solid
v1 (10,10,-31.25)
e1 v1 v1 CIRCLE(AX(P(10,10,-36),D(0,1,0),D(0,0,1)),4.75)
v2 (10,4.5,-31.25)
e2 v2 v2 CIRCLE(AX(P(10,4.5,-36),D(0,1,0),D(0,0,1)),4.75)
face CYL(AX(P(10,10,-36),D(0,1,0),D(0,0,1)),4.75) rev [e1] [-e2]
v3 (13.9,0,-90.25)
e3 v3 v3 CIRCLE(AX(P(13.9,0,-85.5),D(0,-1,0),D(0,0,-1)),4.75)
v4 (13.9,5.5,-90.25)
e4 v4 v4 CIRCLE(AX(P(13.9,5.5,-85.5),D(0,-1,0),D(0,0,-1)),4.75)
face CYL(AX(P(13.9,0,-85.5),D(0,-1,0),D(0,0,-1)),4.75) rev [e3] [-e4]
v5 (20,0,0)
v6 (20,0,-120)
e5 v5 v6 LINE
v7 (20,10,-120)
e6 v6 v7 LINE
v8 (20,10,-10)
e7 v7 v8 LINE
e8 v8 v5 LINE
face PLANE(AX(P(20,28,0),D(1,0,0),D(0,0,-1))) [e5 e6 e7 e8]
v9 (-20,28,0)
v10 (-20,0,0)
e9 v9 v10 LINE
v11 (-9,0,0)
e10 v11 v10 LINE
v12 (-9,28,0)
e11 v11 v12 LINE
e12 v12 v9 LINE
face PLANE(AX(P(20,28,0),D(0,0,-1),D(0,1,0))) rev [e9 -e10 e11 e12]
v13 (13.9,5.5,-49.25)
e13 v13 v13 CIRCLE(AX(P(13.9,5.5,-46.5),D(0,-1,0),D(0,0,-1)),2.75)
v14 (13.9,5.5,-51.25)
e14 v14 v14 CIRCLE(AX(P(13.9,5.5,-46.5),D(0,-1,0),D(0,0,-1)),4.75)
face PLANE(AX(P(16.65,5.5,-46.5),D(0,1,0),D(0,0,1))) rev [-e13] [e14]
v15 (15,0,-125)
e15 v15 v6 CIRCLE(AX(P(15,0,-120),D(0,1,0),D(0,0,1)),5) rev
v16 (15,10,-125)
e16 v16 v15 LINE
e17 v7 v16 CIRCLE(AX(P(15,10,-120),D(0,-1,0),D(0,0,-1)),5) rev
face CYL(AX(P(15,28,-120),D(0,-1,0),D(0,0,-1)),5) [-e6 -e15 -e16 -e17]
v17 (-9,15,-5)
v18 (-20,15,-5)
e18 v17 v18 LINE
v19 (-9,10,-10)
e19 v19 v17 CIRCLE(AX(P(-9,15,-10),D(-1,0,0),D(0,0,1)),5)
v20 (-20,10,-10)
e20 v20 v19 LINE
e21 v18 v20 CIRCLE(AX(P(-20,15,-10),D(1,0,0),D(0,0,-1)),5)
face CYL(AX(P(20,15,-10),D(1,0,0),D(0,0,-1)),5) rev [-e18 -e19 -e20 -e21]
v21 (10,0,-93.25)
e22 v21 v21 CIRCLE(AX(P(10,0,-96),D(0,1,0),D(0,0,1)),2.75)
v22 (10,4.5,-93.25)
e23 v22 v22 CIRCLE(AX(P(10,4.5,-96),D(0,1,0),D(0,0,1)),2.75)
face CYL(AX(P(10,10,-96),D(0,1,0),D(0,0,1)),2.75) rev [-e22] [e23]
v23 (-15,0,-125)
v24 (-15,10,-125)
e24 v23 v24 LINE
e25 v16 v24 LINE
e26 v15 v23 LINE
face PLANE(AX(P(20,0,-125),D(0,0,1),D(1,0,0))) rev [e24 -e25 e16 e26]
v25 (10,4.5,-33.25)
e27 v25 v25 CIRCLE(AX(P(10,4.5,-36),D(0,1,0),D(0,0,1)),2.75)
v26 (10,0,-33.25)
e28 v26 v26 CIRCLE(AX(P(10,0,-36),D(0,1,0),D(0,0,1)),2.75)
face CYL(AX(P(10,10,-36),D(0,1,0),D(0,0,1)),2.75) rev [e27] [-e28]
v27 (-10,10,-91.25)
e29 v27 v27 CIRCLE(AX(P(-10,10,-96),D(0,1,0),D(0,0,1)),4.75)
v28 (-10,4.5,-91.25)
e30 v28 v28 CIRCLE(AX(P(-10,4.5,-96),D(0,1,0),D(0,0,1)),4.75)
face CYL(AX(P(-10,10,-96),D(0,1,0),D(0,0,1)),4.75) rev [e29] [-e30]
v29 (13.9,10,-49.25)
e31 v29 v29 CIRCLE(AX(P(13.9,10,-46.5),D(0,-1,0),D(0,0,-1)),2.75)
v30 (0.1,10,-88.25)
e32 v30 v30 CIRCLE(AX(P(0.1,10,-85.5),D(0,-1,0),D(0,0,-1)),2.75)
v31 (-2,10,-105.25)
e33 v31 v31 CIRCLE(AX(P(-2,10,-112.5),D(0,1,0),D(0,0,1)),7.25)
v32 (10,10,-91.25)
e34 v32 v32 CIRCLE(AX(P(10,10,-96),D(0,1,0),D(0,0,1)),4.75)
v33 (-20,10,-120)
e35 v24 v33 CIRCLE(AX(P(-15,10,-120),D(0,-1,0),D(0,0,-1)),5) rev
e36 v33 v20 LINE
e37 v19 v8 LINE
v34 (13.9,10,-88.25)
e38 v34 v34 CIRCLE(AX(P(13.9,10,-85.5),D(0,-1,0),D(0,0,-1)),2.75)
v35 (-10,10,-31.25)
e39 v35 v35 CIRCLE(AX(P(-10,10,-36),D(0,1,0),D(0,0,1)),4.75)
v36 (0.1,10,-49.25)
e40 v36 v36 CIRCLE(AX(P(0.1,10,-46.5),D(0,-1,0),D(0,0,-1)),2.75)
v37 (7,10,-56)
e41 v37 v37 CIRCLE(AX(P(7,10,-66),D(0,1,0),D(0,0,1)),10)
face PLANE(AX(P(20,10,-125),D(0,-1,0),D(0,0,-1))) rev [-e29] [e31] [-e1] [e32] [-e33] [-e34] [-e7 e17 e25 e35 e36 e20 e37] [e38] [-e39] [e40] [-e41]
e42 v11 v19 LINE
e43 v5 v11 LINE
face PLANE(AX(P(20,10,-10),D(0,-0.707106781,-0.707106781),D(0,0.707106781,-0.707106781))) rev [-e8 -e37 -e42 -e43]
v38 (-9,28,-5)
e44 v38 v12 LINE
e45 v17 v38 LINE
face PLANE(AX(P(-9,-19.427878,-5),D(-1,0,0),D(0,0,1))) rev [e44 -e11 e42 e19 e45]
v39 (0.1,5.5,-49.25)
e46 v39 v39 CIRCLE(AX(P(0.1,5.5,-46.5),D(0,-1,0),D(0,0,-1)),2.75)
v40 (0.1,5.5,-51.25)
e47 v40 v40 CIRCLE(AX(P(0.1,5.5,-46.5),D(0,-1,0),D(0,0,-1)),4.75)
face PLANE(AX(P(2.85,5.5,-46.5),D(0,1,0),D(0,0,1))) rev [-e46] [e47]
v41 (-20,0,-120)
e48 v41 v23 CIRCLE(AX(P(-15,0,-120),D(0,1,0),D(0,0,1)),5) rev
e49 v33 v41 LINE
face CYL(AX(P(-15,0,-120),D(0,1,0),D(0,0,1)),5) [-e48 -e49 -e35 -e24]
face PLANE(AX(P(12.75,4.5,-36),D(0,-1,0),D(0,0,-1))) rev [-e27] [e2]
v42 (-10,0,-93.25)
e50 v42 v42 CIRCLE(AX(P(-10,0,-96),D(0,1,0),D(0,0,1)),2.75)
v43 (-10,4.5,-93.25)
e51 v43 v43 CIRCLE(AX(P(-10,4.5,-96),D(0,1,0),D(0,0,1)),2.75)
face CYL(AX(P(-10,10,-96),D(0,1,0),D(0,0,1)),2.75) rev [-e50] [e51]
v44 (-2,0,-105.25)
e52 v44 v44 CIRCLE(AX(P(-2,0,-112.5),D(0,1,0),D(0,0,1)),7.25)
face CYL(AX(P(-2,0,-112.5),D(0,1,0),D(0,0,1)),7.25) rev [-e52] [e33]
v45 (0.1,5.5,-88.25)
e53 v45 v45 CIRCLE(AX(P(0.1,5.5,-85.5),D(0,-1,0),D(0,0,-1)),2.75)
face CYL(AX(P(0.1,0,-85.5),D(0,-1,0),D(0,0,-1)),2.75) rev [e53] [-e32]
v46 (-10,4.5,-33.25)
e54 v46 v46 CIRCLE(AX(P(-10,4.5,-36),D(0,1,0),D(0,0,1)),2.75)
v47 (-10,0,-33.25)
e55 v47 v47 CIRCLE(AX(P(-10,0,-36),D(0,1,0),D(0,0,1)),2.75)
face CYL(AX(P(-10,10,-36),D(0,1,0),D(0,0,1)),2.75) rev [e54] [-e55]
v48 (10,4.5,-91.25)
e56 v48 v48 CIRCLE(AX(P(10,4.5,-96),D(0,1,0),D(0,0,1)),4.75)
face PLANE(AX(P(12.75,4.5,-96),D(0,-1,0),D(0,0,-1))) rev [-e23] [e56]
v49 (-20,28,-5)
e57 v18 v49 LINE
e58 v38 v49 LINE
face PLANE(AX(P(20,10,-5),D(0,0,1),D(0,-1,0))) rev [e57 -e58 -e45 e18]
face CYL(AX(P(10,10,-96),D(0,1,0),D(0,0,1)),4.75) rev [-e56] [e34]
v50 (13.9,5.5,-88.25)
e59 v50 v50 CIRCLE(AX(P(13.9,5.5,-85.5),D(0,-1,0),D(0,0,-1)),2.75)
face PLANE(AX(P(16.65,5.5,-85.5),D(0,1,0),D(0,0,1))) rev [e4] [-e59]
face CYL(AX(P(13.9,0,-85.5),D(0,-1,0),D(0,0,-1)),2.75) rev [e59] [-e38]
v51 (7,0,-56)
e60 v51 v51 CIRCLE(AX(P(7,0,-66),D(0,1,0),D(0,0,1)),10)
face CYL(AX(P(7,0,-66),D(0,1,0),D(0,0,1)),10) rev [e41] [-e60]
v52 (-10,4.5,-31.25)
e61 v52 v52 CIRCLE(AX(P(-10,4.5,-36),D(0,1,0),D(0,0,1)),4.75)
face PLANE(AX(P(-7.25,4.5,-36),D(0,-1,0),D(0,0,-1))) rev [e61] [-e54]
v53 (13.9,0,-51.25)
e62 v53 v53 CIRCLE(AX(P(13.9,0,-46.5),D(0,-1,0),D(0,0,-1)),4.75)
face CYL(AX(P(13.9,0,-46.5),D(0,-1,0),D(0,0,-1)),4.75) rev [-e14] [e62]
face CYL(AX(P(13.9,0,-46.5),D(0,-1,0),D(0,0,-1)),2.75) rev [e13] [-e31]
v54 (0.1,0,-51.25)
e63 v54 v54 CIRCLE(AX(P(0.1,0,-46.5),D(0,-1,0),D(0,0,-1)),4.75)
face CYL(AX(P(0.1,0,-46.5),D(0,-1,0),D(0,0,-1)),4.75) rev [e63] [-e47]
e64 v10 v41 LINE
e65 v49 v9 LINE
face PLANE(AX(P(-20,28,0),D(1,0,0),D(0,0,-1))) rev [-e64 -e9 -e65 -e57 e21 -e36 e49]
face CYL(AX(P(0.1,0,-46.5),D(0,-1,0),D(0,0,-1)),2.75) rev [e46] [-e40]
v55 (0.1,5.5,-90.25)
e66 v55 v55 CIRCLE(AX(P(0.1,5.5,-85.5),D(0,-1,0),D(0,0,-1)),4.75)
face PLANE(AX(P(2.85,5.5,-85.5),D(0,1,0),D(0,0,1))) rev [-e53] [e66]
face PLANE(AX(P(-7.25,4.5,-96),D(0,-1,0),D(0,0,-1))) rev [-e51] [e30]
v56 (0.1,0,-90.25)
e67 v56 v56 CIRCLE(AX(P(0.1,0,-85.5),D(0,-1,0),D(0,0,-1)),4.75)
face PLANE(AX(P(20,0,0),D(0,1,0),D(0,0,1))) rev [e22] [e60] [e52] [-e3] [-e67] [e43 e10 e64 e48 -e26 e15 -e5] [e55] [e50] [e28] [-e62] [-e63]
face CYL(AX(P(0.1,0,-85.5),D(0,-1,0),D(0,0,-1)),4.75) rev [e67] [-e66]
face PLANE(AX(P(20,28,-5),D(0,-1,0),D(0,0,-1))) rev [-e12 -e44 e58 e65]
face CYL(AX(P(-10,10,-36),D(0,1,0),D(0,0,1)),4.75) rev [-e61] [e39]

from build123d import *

# Parameters (mm, degrees)
EXTRUDE_1_DEPTH           = 20
SKETCH_2_W                = 29
SKETCH_2_H                = 5
CUT_EXTRUDE_1_DEPTH       = 18
FILLET_1_R                = 5
CHAMFER_1_SIZE            = 10
SKETCH_3_R                = 10
CUT_EXTRUDE_2_DEPTH       = 128.863208156
HOLE_WIZARD_1_D           = 5.5
HOLE_WIZARD_1_CBORE_D     = 9.5
HOLE_WIZARD_1_CBORE_DEPTH = 5.5
HOLE_WIZARD_2_D           = 5.5
HOLE_WIZARD_2_DEPTH       = 31
HOLE_WIZARD_2_CBORE_D     = 9.5
HOLE_WIZARD_2_CBORE_DEPTH = 5.5
SKETCH_9_R                = 7.25
CUT_EXTRUDE_3_DEPTH       = 128.863208156
FILLET_2_R                = 5


with BuildPart() as part:
    # 草图1 → 凸台-拉伸1 (new, symmetric)
    with BuildSketch(Plane(origin=(0, 0, 0), x_dir=(0, 0, -1), z_dir=(1, 0, 0))):
        Polygon((0, 28), (0, 0), (125, 0), (125, 10), (5, 10), (5, 28), align=None)
    extrude(amount=EXTRUDE_1_DEPTH, both=True)

    # 草图2 → 切除-拉伸1 (cut)
    with BuildSketch(Plane(origin=(0, 28, 0), x_dir=(1, 0, 0), z_dir=(0, 1, 0))):
        with Locations((5.5, 2.5)):
            Rectangle(SKETCH_2_W, SKETCH_2_H)
    extrude(amount=-CUT_EXTRUDE_1_DEPTH, mode=Mode.SUBTRACT)

    # 圆角1
    fillet_1_edges = [part.edges().sort_by_distance(p)[0] for p in [
        (-14.5, 10, -5),
    ]]
    fillet(fillet_1_edges, radius=FILLET_1_R)

    # 倒角1
    chamfer_1_edges = [part.edges().sort_by_distance(p)[0] for p in [
        (5.5, 10, 0),
    ]]
    chamfer(chamfer_1_edges, length=CHAMFER_1_SIZE - 0.0001)  # a hair under: the kernel refuses the full size

    # 草图3 → 切除-拉伸2 (cut, through all)
    with BuildSketch(Plane(origin=(0, 10, 0), x_dir=(1, 0, 0), z_dir=(0, 1, 0))):
        with Locations(Location((7, 66, 0), (0, 0, 270))):
            Circle(SKETCH_3_R)
    extrude(amount=-CUT_EXTRUDE_2_DEPTH, mode=Mode.SUBTRACT)

    # 孔1 (through all)
    with Locations(Plane.XZ):
        with Locations((13.9, -46.5), (0.1, -46.5), (0.1, -85.5), (13.9, -85.5)):
            CounterBoreHole(HOLE_WIZARD_1_D / 2, HOLE_WIZARD_1_CBORE_D / 2, HOLE_WIZARD_1_CBORE_DEPTH)

    # 孔2
    with Locations(Plane(origin=(0, 10, 0), x_dir=(-1, 0, 0), z_dir=(0, 1, 0))):
        with Locations((-10, -96), (10, -96), (10, -36), (-10, -36)):
            CounterBoreHole(HOLE_WIZARD_2_D / 2, HOLE_WIZARD_2_CBORE_D / 2, HOLE_WIZARD_2_CBORE_DEPTH, depth=HOLE_WIZARD_2_DEPTH)

    # 草图9 → 切除-拉伸3 (cut, through all)
    with BuildSketch(Plane(origin=(0, 10, 0), x_dir=(1, 0, 0), z_dir=(0, 1, 0))):
        with Locations(Location((-2, 112.5, 0), (0, 0, 270))):
            Circle(SKETCH_9_R)
    extrude(amount=-CUT_EXTRUDE_3_DEPTH, mode=Mode.SUBTRACT)

    # 圆角2
    fillet_2_edges = [part.edges().sort_by_distance(p)[0] for p in [
        (20, 5, -125),
        (-20, 5, -125),
    ]]
    fillet(fillet_2_edges, radius=FILLET_2_R)


solid = part.part
